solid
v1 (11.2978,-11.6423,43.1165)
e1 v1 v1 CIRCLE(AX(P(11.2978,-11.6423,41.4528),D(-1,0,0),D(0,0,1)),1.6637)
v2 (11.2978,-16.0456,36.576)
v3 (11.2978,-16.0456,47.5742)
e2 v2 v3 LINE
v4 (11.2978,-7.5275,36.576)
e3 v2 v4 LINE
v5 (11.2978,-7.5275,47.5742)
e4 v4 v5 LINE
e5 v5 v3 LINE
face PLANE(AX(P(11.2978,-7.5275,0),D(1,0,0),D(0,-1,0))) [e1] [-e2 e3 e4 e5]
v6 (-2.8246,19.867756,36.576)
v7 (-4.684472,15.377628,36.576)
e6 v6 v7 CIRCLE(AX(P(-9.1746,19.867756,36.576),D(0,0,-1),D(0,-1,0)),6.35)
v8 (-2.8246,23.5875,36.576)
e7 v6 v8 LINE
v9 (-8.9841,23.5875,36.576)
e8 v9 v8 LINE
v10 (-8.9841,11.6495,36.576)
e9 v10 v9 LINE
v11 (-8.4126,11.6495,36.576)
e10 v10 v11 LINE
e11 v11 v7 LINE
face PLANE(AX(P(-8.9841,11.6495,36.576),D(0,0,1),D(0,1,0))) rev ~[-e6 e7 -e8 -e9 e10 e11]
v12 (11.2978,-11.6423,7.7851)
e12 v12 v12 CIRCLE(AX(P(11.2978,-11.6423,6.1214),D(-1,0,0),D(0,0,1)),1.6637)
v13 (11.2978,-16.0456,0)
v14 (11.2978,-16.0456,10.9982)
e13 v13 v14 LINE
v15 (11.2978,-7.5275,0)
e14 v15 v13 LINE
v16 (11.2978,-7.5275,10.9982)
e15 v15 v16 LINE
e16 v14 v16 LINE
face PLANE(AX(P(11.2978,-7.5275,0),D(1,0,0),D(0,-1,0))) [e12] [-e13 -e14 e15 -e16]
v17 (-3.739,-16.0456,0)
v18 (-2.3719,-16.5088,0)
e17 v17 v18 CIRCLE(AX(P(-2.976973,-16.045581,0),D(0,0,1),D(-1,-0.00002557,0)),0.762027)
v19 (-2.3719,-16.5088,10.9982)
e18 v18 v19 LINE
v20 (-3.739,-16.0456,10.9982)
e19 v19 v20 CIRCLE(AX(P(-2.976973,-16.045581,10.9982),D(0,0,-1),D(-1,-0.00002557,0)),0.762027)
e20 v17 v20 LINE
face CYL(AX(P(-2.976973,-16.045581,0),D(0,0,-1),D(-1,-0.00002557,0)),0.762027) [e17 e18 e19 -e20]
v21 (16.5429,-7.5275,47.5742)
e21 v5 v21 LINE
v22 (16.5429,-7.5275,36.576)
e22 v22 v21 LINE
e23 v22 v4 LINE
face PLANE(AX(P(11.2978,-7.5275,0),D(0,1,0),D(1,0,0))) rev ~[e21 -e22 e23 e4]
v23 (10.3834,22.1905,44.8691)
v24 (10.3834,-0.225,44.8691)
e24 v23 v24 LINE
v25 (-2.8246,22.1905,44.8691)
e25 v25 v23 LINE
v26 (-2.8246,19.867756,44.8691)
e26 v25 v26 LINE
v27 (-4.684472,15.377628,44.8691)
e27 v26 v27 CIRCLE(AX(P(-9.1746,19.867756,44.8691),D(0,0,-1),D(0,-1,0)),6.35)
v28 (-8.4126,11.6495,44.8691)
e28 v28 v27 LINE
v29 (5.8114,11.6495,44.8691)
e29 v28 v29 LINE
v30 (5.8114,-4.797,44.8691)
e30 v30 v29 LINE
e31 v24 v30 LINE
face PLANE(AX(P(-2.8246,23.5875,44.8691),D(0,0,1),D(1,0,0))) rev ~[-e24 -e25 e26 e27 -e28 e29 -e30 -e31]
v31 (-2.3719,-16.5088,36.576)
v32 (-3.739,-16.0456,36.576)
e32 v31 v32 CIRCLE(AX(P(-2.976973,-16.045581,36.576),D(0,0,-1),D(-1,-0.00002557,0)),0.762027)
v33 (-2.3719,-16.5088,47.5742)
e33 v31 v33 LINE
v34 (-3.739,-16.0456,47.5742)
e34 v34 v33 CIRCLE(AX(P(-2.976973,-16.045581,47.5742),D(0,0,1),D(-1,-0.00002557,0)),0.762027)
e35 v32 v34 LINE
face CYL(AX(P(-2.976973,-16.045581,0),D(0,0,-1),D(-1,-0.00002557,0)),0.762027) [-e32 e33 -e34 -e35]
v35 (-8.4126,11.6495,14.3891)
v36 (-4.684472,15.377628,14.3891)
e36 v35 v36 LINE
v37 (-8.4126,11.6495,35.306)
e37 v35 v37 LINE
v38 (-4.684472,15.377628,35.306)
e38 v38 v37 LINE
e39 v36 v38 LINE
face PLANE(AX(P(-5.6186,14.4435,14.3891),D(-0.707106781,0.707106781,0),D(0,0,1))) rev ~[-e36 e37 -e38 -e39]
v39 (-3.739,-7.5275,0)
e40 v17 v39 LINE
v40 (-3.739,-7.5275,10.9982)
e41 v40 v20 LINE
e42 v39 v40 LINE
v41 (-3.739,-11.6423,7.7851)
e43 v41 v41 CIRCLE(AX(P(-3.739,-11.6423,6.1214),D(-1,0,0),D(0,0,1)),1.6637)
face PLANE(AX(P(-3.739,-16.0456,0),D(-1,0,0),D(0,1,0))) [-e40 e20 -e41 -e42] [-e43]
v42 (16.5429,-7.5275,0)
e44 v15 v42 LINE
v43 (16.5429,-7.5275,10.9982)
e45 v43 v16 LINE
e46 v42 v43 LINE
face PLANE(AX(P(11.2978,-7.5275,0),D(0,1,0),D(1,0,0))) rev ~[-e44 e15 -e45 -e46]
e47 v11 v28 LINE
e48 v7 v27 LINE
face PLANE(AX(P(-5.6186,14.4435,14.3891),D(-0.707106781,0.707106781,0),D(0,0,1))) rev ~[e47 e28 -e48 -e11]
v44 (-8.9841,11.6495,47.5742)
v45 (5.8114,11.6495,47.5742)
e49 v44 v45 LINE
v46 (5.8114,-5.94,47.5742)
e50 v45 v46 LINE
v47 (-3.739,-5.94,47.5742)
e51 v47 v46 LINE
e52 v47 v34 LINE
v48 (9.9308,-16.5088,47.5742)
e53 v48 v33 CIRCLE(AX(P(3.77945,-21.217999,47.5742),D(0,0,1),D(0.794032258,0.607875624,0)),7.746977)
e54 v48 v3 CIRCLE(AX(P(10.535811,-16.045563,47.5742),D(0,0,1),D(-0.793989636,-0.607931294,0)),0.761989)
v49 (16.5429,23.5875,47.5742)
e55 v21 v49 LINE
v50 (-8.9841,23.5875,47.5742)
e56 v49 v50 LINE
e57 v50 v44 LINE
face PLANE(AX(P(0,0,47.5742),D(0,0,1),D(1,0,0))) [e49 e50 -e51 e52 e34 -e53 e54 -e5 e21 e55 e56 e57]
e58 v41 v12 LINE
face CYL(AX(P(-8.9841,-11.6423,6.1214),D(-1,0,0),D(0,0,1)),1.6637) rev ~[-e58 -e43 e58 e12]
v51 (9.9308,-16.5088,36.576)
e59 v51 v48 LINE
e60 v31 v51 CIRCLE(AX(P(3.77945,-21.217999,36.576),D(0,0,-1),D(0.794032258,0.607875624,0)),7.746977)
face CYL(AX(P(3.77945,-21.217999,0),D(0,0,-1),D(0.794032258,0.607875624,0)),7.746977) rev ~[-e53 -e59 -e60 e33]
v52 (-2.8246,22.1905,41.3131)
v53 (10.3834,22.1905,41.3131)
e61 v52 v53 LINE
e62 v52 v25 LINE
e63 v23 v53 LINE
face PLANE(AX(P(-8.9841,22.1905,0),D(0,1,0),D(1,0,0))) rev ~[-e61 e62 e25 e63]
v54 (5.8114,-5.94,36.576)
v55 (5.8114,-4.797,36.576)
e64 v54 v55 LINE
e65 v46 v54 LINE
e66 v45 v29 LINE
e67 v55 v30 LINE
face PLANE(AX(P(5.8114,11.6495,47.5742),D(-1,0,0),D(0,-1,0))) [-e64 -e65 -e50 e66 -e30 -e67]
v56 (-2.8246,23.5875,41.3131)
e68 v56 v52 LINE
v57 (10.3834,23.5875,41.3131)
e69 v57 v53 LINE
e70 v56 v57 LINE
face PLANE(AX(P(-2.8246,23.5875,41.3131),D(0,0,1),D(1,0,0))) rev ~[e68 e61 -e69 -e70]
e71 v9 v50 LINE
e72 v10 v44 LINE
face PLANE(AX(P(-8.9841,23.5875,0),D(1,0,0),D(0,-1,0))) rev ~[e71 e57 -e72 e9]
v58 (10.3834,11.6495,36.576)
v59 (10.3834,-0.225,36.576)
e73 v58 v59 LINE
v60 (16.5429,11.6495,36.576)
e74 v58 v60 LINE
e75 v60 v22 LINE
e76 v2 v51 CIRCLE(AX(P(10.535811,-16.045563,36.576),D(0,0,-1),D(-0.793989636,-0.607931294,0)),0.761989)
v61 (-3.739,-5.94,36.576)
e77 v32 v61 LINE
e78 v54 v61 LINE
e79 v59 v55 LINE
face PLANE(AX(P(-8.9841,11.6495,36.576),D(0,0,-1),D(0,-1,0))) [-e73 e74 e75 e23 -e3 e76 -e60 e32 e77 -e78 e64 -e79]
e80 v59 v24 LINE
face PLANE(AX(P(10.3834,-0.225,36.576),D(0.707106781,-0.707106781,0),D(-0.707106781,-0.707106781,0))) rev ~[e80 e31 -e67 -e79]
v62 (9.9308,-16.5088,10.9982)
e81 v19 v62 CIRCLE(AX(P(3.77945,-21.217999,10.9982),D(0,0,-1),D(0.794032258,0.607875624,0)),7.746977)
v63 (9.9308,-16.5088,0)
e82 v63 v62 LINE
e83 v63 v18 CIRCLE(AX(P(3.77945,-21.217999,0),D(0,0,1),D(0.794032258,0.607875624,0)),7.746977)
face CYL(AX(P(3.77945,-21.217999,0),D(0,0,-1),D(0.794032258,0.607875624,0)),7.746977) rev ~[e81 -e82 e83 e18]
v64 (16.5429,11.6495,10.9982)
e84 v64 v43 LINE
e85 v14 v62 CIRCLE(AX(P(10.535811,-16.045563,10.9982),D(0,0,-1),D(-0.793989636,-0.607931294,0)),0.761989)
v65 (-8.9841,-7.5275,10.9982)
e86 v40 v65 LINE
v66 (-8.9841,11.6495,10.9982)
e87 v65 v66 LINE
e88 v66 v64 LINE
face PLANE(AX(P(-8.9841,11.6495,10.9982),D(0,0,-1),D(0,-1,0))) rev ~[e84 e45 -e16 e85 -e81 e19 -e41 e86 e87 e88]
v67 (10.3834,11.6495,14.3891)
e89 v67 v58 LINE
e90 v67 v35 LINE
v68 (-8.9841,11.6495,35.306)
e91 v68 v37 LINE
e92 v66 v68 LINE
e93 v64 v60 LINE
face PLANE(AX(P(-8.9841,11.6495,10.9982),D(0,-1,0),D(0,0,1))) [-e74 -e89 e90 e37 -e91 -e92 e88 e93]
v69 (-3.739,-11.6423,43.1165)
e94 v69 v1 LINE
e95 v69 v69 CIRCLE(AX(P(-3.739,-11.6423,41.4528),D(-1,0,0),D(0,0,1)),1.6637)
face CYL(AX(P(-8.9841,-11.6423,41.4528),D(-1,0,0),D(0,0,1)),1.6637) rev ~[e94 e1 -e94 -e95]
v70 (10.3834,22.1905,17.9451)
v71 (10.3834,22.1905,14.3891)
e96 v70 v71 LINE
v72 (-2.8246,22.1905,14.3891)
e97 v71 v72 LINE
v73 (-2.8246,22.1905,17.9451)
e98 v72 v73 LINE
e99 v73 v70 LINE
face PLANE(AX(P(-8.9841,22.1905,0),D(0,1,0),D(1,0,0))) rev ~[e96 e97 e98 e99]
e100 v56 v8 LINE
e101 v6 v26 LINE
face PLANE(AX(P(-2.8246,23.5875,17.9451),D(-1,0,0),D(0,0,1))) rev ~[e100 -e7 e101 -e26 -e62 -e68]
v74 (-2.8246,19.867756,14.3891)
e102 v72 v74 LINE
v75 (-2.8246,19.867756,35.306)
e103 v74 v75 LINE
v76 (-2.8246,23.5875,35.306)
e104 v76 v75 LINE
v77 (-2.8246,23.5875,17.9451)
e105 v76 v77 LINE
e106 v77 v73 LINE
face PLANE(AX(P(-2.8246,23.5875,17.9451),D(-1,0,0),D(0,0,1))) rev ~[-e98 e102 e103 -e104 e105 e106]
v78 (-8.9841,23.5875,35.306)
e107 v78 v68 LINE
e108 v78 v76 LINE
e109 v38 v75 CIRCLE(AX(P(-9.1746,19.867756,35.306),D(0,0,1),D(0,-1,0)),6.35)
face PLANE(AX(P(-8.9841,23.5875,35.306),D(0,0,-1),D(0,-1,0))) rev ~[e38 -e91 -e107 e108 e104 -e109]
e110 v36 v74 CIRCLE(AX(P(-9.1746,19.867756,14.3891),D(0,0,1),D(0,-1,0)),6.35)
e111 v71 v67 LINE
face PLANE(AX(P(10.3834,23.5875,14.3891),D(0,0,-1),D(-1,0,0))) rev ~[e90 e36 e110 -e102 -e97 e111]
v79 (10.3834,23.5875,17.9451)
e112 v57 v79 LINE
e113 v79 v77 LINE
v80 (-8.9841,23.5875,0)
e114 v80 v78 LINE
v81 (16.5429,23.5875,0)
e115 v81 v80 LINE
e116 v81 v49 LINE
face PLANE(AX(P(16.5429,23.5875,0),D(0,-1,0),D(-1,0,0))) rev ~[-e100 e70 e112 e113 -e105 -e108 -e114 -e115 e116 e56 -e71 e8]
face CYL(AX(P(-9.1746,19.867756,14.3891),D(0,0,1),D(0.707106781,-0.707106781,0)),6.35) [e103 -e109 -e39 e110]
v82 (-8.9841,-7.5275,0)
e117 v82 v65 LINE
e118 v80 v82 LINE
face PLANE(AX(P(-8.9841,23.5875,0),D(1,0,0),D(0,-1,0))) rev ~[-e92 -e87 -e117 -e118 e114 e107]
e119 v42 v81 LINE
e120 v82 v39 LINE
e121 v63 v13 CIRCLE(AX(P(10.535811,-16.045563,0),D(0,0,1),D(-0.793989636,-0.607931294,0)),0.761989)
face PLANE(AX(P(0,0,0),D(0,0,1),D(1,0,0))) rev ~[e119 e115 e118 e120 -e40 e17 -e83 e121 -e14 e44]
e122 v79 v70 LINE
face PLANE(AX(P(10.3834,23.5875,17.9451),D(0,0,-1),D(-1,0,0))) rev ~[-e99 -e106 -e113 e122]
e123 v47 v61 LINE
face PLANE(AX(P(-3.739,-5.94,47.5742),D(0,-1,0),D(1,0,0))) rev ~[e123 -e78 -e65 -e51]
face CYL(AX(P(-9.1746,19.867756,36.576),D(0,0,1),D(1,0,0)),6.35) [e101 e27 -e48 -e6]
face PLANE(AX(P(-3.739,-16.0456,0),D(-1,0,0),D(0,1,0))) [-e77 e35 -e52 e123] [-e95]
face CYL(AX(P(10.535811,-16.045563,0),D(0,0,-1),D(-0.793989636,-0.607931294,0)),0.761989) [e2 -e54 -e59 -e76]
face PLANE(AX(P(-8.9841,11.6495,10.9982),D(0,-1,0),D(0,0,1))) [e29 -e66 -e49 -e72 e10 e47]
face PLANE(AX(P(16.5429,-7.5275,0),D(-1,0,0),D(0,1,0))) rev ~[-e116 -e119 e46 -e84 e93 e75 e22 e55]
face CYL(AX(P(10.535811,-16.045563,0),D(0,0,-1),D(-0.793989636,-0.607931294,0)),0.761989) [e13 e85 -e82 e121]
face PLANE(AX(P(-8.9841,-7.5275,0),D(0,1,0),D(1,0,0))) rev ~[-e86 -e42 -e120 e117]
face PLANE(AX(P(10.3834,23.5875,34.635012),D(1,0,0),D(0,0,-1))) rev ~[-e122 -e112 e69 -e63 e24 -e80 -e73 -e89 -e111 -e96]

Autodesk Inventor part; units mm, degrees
ref_plane "YZ Plane" through (0, 0, 0) normal (1, 0, 0) x (0, 1, 0)
ref_plane "XZ Plane" through (0, 0, 0) normal (0, 1, 0) x (-1, 0, 0)
ref_plane "XY Plane" through (0, 0, 0) normal (0, 0, 1) x (1, 0, 0)
sketch "Side Block" plane through (0, 0, 0) normal (0, 0, 1) x (1, 0, 0)
  line L0 (11.2978, -7.5275) -> (11.2978, -16.0456)
  line L1 (11.2978, -7.5275) -> (16.5429, -7.5275)
  line L2 (16.5429, -7.5275) -> (16.5429, 23.5875)
  line L3 (16.5429, 23.5875) -> (-8.9841, 23.5875)
  line L4 (-8.9841, 23.5875) -> (-8.9841, -7.5275)
  line L5 (-8.9841, -7.5275) -> (-3.739, -7.5275)
  line L6 (-3.739, -16.0456) -> (-3.739, -7.5275)
  line L7 (3.7794, -23.2501) -> (3.7794, -21.2181)
  arc A0 (9.9308, -16.5088) -> (-2.3719, -16.5088) centre (3.7794, -21.2181) ccw
  arc A1 (-3.739, -16.0456) -> (-2.3719, -16.5088) centre (-2.977, -16.0456) ccw
  arc A2 (9.9308, -16.5088) -> (11.2978, -16.0456) centre (10.5358, -16.0456) ccw
  point P0 (3.7794, -4.0139)
  point P1 (-3.739, -19.35)
  point P2 (11.2978, -19.35)
  dimension "d2" = 31.115
  dimension "d3" = 31.115
  dimension "d4" = 5.2451
  dimension "d5" = 25.527
  dimension "d58" = 2.032
  dimension "d59" = 15.494
  dimension "d60" = 0.762
sketch "Motor Containment" plane through (0, 0, 0) normal (0, 0, 1) x (1, 0, 0)
  line L0 (-35.1538, -13.4444) -> (-35.1538, -17.0004) construction
  line L1 (-35.1538, -40.3684) -> (-35.1538, -43.9244) construction
  line L2 (-35.1538, -17.0004) -> (-35.1538, -22.8424)
  line L3 (-41.7578, -43.9244) -> (-28.5498, -43.9244)
  line L4 (-28.5498, -43.9244) -> (-28.5498, -13.4444)
  line L5 (-28.5498, -13.4444) -> (-41.7578, -13.4444)
  line L6 (-41.7578, -13.4444) -> (-41.7578, -43.9244)
  line L7 (-41.7578, -40.3684) -> (-28.5498, -40.3684)
  line L8 (-28.5498, -40.3684) -> (-28.5498, -17.0004)
  line L9 (-28.5498, -17.0004) -> (-41.7578, -17.0004)
  line L10 (-41.7578, -17.0004) -> (-41.7578, -40.3684)
  point P0 (-35.1538, -28.1145)
  dimension "d17" = 13.208
  dimension "d18" = 30.48
  dimension "d19" = 23.368
  dimension "d20" = 5.842
sketch "Sketch1" plane through (0, 0, 0) normal (0, 0, 1) x (1, 0, 0)
  line L0 (11.2978, -7.5275) -> (11.2978, -16.0456)
  line L1 (11.2978, -7.5275) -> (16.5429, -7.5275)
  line L2 (16.5429, -7.5275) -> (16.5429, 23.5875)
  line L3 (16.5429, 23.5875) -> (-8.9841, 23.5875)
  line L4 (-8.9841, 23.5875) -> (-8.9841, -7.5275)
  line L5 (-8.9841, -7.5275) -> (-3.739, -7.5275)
  line L6 (-3.739, -16.0456) -> (-3.739, -7.5275)
  line L7 (3.7794, -23.2501) -> (3.7794, -21.2181)
  arc A0 (9.9308, -16.5088) -> (-2.3719, -16.5088) centre (3.7794, -21.2181) ccw
  arc A1 (-3.739, -16.0456) -> (-2.3719, -16.5088) centre (-2.977, -16.0456) ccw
  arc A2 (9.9308, -16.5088) -> (11.2978, -16.0456) centre (10.5358, -16.0456) ccw
  point P0 (0, 0)
  dimension "d6" = 23.5875
extrude "Extrusion1" add sketch "Sketch1" along normal blind 47.5742
sketch "Sketch2" plane through (-8.9841, 23.5875, 0) normal (0, 1, 0) x (1, 0, 0)
  line L0 (0, -47.5742) -> (5.2451, -47.5742) projected
  line L1 (20.2819, 0) -> (25.527, 0) projected
  line L2 (0, -47.5742) -> (25.527, -47.5742)
  line L3 (25.527, -47.5742) -> (25.527, 0)
  line L4 (25.527, 0) -> (0, 0)
  line L5 (0, 0) -> (0, -47.5742)
  line L6 (0, -23.7871) -> (25.527, -23.7871) construction
  circle A0 centre (12.7635, -23.7871) radius 12.7
  line L7 (0, 0) -> (0, -47.5742) projected
  line L8 (0, -11.0871) -> (25.527, -11.0871)
  line L9 (12.7635, -14.3891) -> (12.7635, -17.9451) construction
  line L10 (12.7635, -41.3131) -> (12.7635, -44.8691) construction
  line L11 (12.7635, -17.9451) -> (12.7635, -23.7871)
  line L12 (6.1595, -44.8691) -> (19.3675, -44.8691)
  line L13 (19.3675, -44.8691) -> (19.3675, -14.3891)
  line L14 (19.3675, -14.3891) -> (6.1595, -14.3891)
  line L15 (6.1595, -14.3891) -> (6.1595, -44.8691)
  line L16 (6.1595, -41.3131) -> (19.3675, -41.3131)
  line L17 (19.3675, -41.3131) -> (19.3675, -17.9451)
  line L18 (19.3675, -17.9451) -> (6.1595, -17.9451)
  line L19 (6.1595, -17.9451) -> (6.1595, -41.3131)
  point P0 (8.9841, 0)
  point P1 (6.1595, -17.9451)
  dimension "d21" = 25.4
sketch "Sketch3" plane through (-8.9841, -7.5275, 0) normal (-1, 0, 0) x (0, 0, 1)
  line L0 (0, 19.177) -> (47.5742, 19.177)
  line L1 (47.5742, 31.115) -> (47.5742, 0) projected
  line L2 (0, 31.115) -> (47.5742, 31.115) projected
  line L3 (41.4528, 31.115) -> (41.4528, -19.3537) construction
  line L4 (6.1214, 31.115) -> (6.1214, -20.7554) construction
  line L5 (0, 31.115) -> (0, 0) construction
  circle A0 centre (6.1214, -4.1148) radius 1.6637
  circle A1 centre (41.4528, -4.1148) radius 1.6637
  line L6 (23.7871, 31.115) -> (23.7871, -19.3537) construction
  line L7 (36.576, 19.177) -> (36.576, -23.6144)
  line L8 (10.9982, 19.177) -> (10.9982, -23.6144)
  line L9 (36.576, -23.6144) -> (10.9982, -23.6144)
  line L10 (0, 0) -> (47.5742, 0) projected
  point P0 (10.9982, 19.177)
  dimension "d26" = 11.938
  dimension "d27" = 6.1214
  dimension "d28" = 6.1214
  dimension "d29" = 3.3274
  dimension "d30" = 3.3274
  dimension "d33" = 10.9982
  dimension "d54" = 4.1148
  dimension "d55" = 4.1148
extrude "Extrusion4" cut sketch "Sketch3" against normal blind 46.0375 contours L0 L7 L10 L8 | L10 L7 L9 L8 | A0 | A1
extrude "Extrusion5" cut sketch "Sketch2" against normal blind 23.8125 contours L15 L18 L13 A0 | A0 L13 L16 L15 | L15 L14 L13 L18 | L16 L13 L12 L15
sketch "Sketch4" plane through (0, 0, 47.5742) normal (0, 0, 1) x (1, 0, 0)
  line L0 (16.5429, 23.5875) -> (-8.9841, 23.5875) construction
  line L1 (3.7794, 23.5875) -> (3.7794, -25.467) construction
  line L2 (5.8114, 11.6495) -> (5.8114, -5.94)
  line L3 (-8.9841, 11.6495) -> (-8.9841, -7.5275) projected
  line L4 (-8.9841, -5.94) -> (16.5429, -5.94)
  line L5 (16.5429, -7.5275) -> (16.5429, 11.6495) projected
  line L6 (-8.9841, -7.5275) -> (-3.739, -7.5275) projected
  line L7 (-8.9841, 11.6495) -> (-2.8246, 11.6495) projected
  line L8 (-8.9841, 11.6495) -> (5.8114, 11.6495)
  line L9 (-3.739, -7.5275) -> (-3.739, -16.0456) projected
  line L10 (-3.739, -7.5275) -> (-3.739, -5.94)
  point P0 (0, 0)
  point P1 (-3.739, -18.0776)
  dimension "d38" = 2.032
  dimension "d39" = 1.5875
extrude "Extrusion6" cut sketch "Sketch4" against normal blind 14.2875
chamfer "Chamfer1" distance 5.588 angle 45 1 edges at (-2.8246, 11.6495, 29.6291)
sketch "Sketch5" plane through (3.7794, -23.2501, 36.576) normal (0, 0, -1) x (-1, 0, 0)
  line L0 (-6.604, 23.0251) -> (-6.604, 34.8996) projected
  line L1 (-6.604, 23.0251) -> (-2.032, 18.4531)
  line L2 (-2.032, 17.3101) -> (-2.032, 23.0251) projected
  line L3 (-6.604, 23.0251) -> (-0.1382, 23.0251) construction
  line L4 (-2.032, 18.4531) -> (-2.032, 23.0251)
  line L5 (-2.032, 23.0251) -> (-6.604, 23.0251)
  point P0 (3.7794, 23.2501)
  dimension "d45" = 45
extrude "Extrusion7" cut sketch "Sketch5" against normal up to surface (8.2931 mm away)
extrude "Extrusion8" add sketch "Sketch2" against normal blind 1.397 contours L15 L14 L13 L18 | L16 L13 L12 L15
sketch "Sketch6" plane through (-8.9841, -7.5275, 0) normal (-1, 0, 0) x (0, 0, 1)
  line L0 (0, 31.115) -> (47.5742, 31.115) projected
  line L1 (36.576, 19.177) -> (14.3891, 19.177) projected
  line L2 (36.576, 31.115) -> (35.306, 31.115)
  line L3 (35.306, 31.115) -> (35.306, 19.177)
  line L4 (35.306, 19.177) -> (36.576, 19.177)
  line L5 (36.576, 19.177) -> (36.576, 31.115)
  line L6 (36.576, 7.3025) -> (36.576, 19.177) projected
  point P0 (0, 7.5275)
  dimension "d52" = 0
  dimension "d53" = 1.27
extrude "Extrusion9" cut sketch "Sketch6" against normal blind 14.2875
fillet "Fillet1" radius 6.35 2 edges at (-2.8246, 17.2375, 40.7226) (-2.8246, 17.2375, 24.8476)
equation "\"d27\" = d28"
equation "\"d30\" = d29"
properties part number "Servo Mount V5"
